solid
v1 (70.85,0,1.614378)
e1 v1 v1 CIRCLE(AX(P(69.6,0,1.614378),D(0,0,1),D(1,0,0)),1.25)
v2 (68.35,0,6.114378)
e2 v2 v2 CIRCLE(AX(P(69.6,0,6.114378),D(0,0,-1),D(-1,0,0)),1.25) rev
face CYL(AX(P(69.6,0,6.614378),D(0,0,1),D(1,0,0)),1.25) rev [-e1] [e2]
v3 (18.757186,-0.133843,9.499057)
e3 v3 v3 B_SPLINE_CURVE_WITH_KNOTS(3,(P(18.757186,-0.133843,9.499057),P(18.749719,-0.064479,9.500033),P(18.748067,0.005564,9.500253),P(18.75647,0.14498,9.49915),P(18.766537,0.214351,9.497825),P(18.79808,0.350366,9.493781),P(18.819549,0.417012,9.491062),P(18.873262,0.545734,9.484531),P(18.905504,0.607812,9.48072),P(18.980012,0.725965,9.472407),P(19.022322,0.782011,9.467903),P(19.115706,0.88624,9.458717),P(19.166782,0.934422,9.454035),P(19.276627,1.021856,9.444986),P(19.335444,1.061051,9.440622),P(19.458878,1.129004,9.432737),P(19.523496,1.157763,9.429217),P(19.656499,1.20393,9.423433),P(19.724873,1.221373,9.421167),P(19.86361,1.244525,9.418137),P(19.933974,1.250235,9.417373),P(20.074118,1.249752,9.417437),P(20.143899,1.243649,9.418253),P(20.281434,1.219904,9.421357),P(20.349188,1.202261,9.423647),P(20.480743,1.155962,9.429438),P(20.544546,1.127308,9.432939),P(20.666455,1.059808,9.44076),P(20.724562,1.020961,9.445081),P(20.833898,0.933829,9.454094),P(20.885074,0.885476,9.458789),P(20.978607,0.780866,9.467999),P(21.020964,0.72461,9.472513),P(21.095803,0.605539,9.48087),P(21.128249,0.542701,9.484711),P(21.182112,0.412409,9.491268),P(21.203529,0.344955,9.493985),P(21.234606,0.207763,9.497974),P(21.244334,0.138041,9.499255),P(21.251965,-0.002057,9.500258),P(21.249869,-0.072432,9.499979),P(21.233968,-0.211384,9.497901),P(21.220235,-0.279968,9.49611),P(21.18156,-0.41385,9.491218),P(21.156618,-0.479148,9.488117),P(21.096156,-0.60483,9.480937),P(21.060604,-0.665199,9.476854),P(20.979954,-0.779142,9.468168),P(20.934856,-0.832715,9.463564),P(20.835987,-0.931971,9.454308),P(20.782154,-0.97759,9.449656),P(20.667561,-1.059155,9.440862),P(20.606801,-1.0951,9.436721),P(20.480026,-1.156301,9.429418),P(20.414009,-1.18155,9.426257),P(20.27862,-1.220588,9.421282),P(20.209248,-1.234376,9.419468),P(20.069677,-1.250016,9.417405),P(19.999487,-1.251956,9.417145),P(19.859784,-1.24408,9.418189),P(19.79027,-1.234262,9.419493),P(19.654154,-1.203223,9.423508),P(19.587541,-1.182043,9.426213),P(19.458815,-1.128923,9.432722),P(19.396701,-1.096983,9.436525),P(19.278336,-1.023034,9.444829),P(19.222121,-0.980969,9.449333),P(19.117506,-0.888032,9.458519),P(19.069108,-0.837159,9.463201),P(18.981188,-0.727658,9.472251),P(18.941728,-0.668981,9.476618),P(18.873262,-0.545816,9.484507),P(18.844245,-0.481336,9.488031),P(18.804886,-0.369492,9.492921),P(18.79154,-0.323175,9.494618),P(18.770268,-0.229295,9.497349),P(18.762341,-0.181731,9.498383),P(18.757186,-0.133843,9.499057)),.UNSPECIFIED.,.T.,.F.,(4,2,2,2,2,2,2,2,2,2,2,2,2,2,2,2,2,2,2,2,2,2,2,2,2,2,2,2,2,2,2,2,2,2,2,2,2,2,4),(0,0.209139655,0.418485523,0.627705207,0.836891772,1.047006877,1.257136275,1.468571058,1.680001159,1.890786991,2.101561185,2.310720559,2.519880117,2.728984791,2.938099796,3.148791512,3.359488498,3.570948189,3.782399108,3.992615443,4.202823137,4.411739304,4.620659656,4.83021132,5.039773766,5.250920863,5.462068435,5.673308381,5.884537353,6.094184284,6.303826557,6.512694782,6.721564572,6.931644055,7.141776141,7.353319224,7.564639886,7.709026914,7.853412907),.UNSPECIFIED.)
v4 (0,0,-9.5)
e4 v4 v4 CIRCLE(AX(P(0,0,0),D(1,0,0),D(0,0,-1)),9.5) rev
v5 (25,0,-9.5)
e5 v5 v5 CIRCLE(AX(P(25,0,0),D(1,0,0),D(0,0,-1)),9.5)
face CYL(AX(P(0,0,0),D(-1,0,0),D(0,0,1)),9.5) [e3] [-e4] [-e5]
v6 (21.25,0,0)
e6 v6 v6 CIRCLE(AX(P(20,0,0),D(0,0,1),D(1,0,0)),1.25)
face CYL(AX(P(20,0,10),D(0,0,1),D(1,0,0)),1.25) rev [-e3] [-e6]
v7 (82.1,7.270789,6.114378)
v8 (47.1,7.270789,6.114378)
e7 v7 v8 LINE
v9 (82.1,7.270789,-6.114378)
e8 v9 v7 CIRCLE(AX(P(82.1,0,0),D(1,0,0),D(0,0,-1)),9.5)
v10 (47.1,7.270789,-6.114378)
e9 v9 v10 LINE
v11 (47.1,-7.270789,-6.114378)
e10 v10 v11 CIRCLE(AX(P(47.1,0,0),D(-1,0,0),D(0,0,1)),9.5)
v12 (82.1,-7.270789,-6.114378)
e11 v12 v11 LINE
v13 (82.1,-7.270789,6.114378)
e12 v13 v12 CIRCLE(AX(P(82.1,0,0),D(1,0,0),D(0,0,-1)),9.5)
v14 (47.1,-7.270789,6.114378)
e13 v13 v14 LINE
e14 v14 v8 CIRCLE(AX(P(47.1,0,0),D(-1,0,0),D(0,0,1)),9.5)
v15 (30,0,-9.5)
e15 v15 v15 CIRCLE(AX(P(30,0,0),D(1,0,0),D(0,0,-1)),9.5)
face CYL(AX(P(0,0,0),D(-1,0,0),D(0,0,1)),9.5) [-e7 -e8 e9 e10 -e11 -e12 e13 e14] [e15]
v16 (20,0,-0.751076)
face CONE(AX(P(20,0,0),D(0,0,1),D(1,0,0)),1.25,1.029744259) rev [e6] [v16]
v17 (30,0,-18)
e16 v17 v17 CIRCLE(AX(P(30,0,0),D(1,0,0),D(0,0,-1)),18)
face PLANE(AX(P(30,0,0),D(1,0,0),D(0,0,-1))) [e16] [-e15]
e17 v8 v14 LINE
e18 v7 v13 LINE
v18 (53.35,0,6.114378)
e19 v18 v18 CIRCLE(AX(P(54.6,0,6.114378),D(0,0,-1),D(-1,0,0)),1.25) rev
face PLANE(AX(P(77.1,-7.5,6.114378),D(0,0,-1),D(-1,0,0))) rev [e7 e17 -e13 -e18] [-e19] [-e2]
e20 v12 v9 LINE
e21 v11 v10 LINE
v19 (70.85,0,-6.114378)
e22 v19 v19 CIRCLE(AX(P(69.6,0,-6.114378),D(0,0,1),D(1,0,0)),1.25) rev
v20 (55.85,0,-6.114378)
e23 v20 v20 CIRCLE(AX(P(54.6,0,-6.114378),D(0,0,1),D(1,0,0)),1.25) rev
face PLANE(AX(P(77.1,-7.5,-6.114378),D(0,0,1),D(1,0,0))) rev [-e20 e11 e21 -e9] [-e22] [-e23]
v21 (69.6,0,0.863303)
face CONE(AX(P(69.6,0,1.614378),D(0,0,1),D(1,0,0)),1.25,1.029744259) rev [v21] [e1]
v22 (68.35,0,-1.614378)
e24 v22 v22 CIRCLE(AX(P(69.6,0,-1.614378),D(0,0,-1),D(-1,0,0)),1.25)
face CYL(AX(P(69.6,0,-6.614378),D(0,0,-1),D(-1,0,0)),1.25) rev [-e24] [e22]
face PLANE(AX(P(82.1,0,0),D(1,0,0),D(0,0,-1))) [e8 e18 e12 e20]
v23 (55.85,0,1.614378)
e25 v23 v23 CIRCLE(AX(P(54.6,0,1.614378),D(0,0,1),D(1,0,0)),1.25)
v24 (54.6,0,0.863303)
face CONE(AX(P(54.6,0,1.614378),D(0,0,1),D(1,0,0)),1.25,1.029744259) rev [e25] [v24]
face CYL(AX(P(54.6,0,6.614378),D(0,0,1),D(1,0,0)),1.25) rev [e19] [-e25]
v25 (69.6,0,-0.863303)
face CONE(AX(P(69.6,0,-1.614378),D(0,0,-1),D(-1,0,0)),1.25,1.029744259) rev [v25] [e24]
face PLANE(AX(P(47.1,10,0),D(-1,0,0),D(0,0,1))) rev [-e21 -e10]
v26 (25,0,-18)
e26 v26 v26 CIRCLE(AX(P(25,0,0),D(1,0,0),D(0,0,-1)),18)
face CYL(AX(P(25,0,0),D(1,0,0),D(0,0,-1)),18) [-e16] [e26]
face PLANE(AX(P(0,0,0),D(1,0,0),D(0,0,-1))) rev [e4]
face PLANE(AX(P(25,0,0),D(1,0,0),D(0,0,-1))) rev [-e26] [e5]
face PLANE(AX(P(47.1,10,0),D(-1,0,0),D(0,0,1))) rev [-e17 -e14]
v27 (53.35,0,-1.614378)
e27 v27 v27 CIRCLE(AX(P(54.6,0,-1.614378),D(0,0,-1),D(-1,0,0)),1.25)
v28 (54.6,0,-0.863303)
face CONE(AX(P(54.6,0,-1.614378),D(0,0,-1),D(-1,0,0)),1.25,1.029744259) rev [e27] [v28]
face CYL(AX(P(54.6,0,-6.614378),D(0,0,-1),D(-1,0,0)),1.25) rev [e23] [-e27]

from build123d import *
from build123d.topology import SkipClean

# Parameters (mm, degrees)
SKETCH1_W                           = 47.1
SKETCH1_H                           = 10
BOSS_EXTRUDE1_START                 = 30
BOSS_EXTRUDE1_DEPTH                 = 30
BOSS_EXTRUDE2_START                 = -17.1
SKETCH8_R                           = 18
BOSS_EXTRUDE2_DEPTH                 = 5
M3X0_5_TAPPED_HOLE3_D               = 2.5
M3X0_5_TAPPED_HOLE3_DEPTH           = 10
M3X0_5_TAPPED_HOLE3_TIP             = 0.751075774
M3X0_5_TAPPED_HOLE2_D               = 2.5
M3X0_5_TAPPED_HOLE2_DEPTH           = 5
M3X0_5_TAPPED_HOLE2_TIP             = 0.751075774
M3X0_5_TAPPED_HOLE2_ON_FACE_2_D     = 2.5
M3X0_5_TAPPED_HOLE2_ON_FACE_2_DEPTH = 5
M3X0_5_TAPPED_HOLE2_ON_FACE_2_TIP   = 0.751075774
BOSS_EXTRUDE3_START                 = 5
BOSS_EXTRUDE3_DEPTH                 = 5
TOLERANCING_START                   = 30
TOLERANCING_OUTLINE_R               = 10
TOLERANCING_OUTLINE_R_2             = 9.5
TOLERANCING_DEPTH                   = 52.1
TOLERANCING_2_OUTLINE_R             = 10
TOLERANCING_2_OUTLINE_R_2           = 9.5
TOLERANCING_2_DEPTH                 = 25
TOLERANCING_START_2                 = 47.1
TOLERANCING_3_DEPTH                 = 35


# Read off the part's stored shape, not the designer's step: Tolerancing
with BuildPart() as part:
    # Sketch1 → Revolve1 (revolve)
    with BuildSketch(Plane.XY, mode=Mode.PRIVATE) as revolve1_sk:
        with Locations((23.55, 5)):
            Rectangle(SKETCH1_W, SKETCH1_H)
    revolve(revolve1_sk.sketch.rotate(Axis((0, 0, 0), (1, 0, 0)), 90), axis=Axis((0, 0, 0), (1, 0, 0)))

    # Sketch3 → Boss-Extrude1 (add)
    with BuildSketch(Plane(origin=(47.1, 0, 0), x_dir=(0, 0, -1), z_dir=(1, 0, 0)).offset(BOSS_EXTRUDE1_START)):
        with BuildLine():
            Line((-6.614378278, -7.5), (-6.614378278, 7.5))
            ThreePointArc((-6.614378278, 7.5), (0, 10), (6.614378278, 7.5))
            Line((6.614378278, 7.5), (6.614378278, -7.5))
            ThreePointArc((6.614378278, -7.5), (0, -10), (-6.614378278, -7.5))
        make_face()
    extrude(amount=-BOSS_EXTRUDE1_DEPTH)

    # Sketch8 → Boss-Extrude2 (add)
    with BuildSketch(Plane(origin=(47.1, 0, 0), x_dir=(0, 0, -1), z_dir=(1, 0, 0)).offset(BOSS_EXTRUDE2_START)):
        Circle(SKETCH8_R)
    extrude(amount=-BOSS_EXTRUDE2_DEPTH)

    # M3x0.5 Tapped Hole3
    with Locations(Plane.XY.offset(10)):
        with Locations((20, 0)):
            Hole(M3X0_5_TAPPED_HOLE3_D / 2, depth=M3X0_5_TAPPED_HOLE3_DEPTH)
            with Locations((0, 0, -(M3X0_5_TAPPED_HOLE3_DEPTH + M3X0_5_TAPPED_HOLE3_TIP / 2))):  # 118° drill point
                Cone(0, M3X0_5_TAPPED_HOLE3_D / 2, M3X0_5_TAPPED_HOLE3_TIP, mode=Mode.SUBTRACT)

    # M3x0.5 Tapped Hole2
    with Locations(Plane(origin=(54.6, 0, 6.614378278), x_dir=(1, 0, 0), z_dir=(0, 0, 1))):
        with Locations((0, 0), (15, 0)):
            Hole(M3X0_5_TAPPED_HOLE2_D / 2, depth=M3X0_5_TAPPED_HOLE2_DEPTH)
            with Locations((0, 0, -(M3X0_5_TAPPED_HOLE2_DEPTH + M3X0_5_TAPPED_HOLE2_TIP / 2))):  # 118° drill point
                Cone(0, M3X0_5_TAPPED_HOLE2_D / 2, M3X0_5_TAPPED_HOLE2_TIP, mode=Mode.SUBTRACT)

    # M3x0.5 Tapped Hole2 on face 2
    with Locations(Plane(origin=(69.6, 0, -6.614378278), x_dir=(-1, 0, 0), z_dir=(0, 0, -1))):
        with Locations((0, 0), (15, 0)):
            Hole(M3X0_5_TAPPED_HOLE2_ON_FACE_2_D / 2, depth=M3X0_5_TAPPED_HOLE2_ON_FACE_2_DEPTH)
            with Locations((0, 0, -(M3X0_5_TAPPED_HOLE2_ON_FACE_2_DEPTH + M3X0_5_TAPPED_HOLE2_ON_FACE_2_TIP / 2))):  # 118° drill point
                Cone(0, M3X0_5_TAPPED_HOLE2_ON_FACE_2_D / 2, M3X0_5_TAPPED_HOLE2_ON_FACE_2_TIP, mode=Mode.SUBTRACT)

    # Sketch9 → Boss-Extrude3 (add)
    with SkipClean():  # the faces are left unmerged after this step: merging them gives an invalid solid
        with BuildSketch(Plane(origin=(77.1, 0, 0), x_dir=(0, 0, -1), z_dir=(1, 0, 0)).offset(BOSS_EXTRUDE3_START)):
            with BuildLine():
                Line((6.614378278, -7.5), (6.614378278, 7.5))
                ThreePointArc((6.614378278, 7.5), (0, 10), (-6.614378278, 7.5))
                Line((-6.614378278, 7.5), (-6.614378278, -7.5))
                ThreePointArc((-6.614378278, -7.5), (0, -10), (6.614378278, -7.5))
            make_face()
        extrude(amount=-BOSS_EXTRUDE3_DEPTH)

    # Tolerancing outline → Tolerancing (cut)
    with BuildSketch(Plane.YZ.offset(TOLERANCING_START)):
        Circle(TOLERANCING_OUTLINE_R)
        Circle(TOLERANCING_OUTLINE_R_2, mode=Mode.SUBTRACT)
    extrude(amount=TOLERANCING_DEPTH, mode=Mode.SUBTRACT)

    # Tolerancing 2 outline → Tolerancing 2 (cut)
    with BuildSketch(Plane.YZ):
        Circle(TOLERANCING_2_OUTLINE_R)
        Circle(TOLERANCING_2_OUTLINE_R_2, mode=Mode.SUBTRACT)
    extrude(amount=TOLERANCING_2_DEPTH, mode=Mode.SUBTRACT)

    # Tolerancing 3 outline → Tolerancing 3 (cut)
    with BuildSketch(Plane.YZ.offset(TOLERANCING_START_2)):
        with BuildLine():
            Line((-7.270789385, 6.114378278), (7.270789385, 6.114378278))
            ThreePointArc((7.270789385, 6.114378278), (7.049374529, 6.368384313), (6.819090848, 6.614378278))
            Line((6.819090848, 6.614378278), (-6.819090848, 6.614378278))
            ThreePointArc((-6.819090848, 6.614378278), (-7.049374529, 6.368384313), (-7.270789385, 6.114378278))
        make_face()
        with BuildLine():
            ThreePointArc((6.819090848, -6.614378278), (7.049374529, -6.368384313), (7.270789385, -6.114378278))
            Line((7.270789385, -6.114378278), (-7.270789385, -6.114378278))
            ThreePointArc((-7.270789385, -6.114378278), (-7.049374529, -6.368384313), (-6.819090848, -6.614378278))
            Line((-6.819090848, -6.614378278), (6.819090848, -6.614378278))
        make_face()
    extrude(amount=TOLERANCING_3_DEPTH, mode=Mode.SUBTRACT)


solid = part.part
